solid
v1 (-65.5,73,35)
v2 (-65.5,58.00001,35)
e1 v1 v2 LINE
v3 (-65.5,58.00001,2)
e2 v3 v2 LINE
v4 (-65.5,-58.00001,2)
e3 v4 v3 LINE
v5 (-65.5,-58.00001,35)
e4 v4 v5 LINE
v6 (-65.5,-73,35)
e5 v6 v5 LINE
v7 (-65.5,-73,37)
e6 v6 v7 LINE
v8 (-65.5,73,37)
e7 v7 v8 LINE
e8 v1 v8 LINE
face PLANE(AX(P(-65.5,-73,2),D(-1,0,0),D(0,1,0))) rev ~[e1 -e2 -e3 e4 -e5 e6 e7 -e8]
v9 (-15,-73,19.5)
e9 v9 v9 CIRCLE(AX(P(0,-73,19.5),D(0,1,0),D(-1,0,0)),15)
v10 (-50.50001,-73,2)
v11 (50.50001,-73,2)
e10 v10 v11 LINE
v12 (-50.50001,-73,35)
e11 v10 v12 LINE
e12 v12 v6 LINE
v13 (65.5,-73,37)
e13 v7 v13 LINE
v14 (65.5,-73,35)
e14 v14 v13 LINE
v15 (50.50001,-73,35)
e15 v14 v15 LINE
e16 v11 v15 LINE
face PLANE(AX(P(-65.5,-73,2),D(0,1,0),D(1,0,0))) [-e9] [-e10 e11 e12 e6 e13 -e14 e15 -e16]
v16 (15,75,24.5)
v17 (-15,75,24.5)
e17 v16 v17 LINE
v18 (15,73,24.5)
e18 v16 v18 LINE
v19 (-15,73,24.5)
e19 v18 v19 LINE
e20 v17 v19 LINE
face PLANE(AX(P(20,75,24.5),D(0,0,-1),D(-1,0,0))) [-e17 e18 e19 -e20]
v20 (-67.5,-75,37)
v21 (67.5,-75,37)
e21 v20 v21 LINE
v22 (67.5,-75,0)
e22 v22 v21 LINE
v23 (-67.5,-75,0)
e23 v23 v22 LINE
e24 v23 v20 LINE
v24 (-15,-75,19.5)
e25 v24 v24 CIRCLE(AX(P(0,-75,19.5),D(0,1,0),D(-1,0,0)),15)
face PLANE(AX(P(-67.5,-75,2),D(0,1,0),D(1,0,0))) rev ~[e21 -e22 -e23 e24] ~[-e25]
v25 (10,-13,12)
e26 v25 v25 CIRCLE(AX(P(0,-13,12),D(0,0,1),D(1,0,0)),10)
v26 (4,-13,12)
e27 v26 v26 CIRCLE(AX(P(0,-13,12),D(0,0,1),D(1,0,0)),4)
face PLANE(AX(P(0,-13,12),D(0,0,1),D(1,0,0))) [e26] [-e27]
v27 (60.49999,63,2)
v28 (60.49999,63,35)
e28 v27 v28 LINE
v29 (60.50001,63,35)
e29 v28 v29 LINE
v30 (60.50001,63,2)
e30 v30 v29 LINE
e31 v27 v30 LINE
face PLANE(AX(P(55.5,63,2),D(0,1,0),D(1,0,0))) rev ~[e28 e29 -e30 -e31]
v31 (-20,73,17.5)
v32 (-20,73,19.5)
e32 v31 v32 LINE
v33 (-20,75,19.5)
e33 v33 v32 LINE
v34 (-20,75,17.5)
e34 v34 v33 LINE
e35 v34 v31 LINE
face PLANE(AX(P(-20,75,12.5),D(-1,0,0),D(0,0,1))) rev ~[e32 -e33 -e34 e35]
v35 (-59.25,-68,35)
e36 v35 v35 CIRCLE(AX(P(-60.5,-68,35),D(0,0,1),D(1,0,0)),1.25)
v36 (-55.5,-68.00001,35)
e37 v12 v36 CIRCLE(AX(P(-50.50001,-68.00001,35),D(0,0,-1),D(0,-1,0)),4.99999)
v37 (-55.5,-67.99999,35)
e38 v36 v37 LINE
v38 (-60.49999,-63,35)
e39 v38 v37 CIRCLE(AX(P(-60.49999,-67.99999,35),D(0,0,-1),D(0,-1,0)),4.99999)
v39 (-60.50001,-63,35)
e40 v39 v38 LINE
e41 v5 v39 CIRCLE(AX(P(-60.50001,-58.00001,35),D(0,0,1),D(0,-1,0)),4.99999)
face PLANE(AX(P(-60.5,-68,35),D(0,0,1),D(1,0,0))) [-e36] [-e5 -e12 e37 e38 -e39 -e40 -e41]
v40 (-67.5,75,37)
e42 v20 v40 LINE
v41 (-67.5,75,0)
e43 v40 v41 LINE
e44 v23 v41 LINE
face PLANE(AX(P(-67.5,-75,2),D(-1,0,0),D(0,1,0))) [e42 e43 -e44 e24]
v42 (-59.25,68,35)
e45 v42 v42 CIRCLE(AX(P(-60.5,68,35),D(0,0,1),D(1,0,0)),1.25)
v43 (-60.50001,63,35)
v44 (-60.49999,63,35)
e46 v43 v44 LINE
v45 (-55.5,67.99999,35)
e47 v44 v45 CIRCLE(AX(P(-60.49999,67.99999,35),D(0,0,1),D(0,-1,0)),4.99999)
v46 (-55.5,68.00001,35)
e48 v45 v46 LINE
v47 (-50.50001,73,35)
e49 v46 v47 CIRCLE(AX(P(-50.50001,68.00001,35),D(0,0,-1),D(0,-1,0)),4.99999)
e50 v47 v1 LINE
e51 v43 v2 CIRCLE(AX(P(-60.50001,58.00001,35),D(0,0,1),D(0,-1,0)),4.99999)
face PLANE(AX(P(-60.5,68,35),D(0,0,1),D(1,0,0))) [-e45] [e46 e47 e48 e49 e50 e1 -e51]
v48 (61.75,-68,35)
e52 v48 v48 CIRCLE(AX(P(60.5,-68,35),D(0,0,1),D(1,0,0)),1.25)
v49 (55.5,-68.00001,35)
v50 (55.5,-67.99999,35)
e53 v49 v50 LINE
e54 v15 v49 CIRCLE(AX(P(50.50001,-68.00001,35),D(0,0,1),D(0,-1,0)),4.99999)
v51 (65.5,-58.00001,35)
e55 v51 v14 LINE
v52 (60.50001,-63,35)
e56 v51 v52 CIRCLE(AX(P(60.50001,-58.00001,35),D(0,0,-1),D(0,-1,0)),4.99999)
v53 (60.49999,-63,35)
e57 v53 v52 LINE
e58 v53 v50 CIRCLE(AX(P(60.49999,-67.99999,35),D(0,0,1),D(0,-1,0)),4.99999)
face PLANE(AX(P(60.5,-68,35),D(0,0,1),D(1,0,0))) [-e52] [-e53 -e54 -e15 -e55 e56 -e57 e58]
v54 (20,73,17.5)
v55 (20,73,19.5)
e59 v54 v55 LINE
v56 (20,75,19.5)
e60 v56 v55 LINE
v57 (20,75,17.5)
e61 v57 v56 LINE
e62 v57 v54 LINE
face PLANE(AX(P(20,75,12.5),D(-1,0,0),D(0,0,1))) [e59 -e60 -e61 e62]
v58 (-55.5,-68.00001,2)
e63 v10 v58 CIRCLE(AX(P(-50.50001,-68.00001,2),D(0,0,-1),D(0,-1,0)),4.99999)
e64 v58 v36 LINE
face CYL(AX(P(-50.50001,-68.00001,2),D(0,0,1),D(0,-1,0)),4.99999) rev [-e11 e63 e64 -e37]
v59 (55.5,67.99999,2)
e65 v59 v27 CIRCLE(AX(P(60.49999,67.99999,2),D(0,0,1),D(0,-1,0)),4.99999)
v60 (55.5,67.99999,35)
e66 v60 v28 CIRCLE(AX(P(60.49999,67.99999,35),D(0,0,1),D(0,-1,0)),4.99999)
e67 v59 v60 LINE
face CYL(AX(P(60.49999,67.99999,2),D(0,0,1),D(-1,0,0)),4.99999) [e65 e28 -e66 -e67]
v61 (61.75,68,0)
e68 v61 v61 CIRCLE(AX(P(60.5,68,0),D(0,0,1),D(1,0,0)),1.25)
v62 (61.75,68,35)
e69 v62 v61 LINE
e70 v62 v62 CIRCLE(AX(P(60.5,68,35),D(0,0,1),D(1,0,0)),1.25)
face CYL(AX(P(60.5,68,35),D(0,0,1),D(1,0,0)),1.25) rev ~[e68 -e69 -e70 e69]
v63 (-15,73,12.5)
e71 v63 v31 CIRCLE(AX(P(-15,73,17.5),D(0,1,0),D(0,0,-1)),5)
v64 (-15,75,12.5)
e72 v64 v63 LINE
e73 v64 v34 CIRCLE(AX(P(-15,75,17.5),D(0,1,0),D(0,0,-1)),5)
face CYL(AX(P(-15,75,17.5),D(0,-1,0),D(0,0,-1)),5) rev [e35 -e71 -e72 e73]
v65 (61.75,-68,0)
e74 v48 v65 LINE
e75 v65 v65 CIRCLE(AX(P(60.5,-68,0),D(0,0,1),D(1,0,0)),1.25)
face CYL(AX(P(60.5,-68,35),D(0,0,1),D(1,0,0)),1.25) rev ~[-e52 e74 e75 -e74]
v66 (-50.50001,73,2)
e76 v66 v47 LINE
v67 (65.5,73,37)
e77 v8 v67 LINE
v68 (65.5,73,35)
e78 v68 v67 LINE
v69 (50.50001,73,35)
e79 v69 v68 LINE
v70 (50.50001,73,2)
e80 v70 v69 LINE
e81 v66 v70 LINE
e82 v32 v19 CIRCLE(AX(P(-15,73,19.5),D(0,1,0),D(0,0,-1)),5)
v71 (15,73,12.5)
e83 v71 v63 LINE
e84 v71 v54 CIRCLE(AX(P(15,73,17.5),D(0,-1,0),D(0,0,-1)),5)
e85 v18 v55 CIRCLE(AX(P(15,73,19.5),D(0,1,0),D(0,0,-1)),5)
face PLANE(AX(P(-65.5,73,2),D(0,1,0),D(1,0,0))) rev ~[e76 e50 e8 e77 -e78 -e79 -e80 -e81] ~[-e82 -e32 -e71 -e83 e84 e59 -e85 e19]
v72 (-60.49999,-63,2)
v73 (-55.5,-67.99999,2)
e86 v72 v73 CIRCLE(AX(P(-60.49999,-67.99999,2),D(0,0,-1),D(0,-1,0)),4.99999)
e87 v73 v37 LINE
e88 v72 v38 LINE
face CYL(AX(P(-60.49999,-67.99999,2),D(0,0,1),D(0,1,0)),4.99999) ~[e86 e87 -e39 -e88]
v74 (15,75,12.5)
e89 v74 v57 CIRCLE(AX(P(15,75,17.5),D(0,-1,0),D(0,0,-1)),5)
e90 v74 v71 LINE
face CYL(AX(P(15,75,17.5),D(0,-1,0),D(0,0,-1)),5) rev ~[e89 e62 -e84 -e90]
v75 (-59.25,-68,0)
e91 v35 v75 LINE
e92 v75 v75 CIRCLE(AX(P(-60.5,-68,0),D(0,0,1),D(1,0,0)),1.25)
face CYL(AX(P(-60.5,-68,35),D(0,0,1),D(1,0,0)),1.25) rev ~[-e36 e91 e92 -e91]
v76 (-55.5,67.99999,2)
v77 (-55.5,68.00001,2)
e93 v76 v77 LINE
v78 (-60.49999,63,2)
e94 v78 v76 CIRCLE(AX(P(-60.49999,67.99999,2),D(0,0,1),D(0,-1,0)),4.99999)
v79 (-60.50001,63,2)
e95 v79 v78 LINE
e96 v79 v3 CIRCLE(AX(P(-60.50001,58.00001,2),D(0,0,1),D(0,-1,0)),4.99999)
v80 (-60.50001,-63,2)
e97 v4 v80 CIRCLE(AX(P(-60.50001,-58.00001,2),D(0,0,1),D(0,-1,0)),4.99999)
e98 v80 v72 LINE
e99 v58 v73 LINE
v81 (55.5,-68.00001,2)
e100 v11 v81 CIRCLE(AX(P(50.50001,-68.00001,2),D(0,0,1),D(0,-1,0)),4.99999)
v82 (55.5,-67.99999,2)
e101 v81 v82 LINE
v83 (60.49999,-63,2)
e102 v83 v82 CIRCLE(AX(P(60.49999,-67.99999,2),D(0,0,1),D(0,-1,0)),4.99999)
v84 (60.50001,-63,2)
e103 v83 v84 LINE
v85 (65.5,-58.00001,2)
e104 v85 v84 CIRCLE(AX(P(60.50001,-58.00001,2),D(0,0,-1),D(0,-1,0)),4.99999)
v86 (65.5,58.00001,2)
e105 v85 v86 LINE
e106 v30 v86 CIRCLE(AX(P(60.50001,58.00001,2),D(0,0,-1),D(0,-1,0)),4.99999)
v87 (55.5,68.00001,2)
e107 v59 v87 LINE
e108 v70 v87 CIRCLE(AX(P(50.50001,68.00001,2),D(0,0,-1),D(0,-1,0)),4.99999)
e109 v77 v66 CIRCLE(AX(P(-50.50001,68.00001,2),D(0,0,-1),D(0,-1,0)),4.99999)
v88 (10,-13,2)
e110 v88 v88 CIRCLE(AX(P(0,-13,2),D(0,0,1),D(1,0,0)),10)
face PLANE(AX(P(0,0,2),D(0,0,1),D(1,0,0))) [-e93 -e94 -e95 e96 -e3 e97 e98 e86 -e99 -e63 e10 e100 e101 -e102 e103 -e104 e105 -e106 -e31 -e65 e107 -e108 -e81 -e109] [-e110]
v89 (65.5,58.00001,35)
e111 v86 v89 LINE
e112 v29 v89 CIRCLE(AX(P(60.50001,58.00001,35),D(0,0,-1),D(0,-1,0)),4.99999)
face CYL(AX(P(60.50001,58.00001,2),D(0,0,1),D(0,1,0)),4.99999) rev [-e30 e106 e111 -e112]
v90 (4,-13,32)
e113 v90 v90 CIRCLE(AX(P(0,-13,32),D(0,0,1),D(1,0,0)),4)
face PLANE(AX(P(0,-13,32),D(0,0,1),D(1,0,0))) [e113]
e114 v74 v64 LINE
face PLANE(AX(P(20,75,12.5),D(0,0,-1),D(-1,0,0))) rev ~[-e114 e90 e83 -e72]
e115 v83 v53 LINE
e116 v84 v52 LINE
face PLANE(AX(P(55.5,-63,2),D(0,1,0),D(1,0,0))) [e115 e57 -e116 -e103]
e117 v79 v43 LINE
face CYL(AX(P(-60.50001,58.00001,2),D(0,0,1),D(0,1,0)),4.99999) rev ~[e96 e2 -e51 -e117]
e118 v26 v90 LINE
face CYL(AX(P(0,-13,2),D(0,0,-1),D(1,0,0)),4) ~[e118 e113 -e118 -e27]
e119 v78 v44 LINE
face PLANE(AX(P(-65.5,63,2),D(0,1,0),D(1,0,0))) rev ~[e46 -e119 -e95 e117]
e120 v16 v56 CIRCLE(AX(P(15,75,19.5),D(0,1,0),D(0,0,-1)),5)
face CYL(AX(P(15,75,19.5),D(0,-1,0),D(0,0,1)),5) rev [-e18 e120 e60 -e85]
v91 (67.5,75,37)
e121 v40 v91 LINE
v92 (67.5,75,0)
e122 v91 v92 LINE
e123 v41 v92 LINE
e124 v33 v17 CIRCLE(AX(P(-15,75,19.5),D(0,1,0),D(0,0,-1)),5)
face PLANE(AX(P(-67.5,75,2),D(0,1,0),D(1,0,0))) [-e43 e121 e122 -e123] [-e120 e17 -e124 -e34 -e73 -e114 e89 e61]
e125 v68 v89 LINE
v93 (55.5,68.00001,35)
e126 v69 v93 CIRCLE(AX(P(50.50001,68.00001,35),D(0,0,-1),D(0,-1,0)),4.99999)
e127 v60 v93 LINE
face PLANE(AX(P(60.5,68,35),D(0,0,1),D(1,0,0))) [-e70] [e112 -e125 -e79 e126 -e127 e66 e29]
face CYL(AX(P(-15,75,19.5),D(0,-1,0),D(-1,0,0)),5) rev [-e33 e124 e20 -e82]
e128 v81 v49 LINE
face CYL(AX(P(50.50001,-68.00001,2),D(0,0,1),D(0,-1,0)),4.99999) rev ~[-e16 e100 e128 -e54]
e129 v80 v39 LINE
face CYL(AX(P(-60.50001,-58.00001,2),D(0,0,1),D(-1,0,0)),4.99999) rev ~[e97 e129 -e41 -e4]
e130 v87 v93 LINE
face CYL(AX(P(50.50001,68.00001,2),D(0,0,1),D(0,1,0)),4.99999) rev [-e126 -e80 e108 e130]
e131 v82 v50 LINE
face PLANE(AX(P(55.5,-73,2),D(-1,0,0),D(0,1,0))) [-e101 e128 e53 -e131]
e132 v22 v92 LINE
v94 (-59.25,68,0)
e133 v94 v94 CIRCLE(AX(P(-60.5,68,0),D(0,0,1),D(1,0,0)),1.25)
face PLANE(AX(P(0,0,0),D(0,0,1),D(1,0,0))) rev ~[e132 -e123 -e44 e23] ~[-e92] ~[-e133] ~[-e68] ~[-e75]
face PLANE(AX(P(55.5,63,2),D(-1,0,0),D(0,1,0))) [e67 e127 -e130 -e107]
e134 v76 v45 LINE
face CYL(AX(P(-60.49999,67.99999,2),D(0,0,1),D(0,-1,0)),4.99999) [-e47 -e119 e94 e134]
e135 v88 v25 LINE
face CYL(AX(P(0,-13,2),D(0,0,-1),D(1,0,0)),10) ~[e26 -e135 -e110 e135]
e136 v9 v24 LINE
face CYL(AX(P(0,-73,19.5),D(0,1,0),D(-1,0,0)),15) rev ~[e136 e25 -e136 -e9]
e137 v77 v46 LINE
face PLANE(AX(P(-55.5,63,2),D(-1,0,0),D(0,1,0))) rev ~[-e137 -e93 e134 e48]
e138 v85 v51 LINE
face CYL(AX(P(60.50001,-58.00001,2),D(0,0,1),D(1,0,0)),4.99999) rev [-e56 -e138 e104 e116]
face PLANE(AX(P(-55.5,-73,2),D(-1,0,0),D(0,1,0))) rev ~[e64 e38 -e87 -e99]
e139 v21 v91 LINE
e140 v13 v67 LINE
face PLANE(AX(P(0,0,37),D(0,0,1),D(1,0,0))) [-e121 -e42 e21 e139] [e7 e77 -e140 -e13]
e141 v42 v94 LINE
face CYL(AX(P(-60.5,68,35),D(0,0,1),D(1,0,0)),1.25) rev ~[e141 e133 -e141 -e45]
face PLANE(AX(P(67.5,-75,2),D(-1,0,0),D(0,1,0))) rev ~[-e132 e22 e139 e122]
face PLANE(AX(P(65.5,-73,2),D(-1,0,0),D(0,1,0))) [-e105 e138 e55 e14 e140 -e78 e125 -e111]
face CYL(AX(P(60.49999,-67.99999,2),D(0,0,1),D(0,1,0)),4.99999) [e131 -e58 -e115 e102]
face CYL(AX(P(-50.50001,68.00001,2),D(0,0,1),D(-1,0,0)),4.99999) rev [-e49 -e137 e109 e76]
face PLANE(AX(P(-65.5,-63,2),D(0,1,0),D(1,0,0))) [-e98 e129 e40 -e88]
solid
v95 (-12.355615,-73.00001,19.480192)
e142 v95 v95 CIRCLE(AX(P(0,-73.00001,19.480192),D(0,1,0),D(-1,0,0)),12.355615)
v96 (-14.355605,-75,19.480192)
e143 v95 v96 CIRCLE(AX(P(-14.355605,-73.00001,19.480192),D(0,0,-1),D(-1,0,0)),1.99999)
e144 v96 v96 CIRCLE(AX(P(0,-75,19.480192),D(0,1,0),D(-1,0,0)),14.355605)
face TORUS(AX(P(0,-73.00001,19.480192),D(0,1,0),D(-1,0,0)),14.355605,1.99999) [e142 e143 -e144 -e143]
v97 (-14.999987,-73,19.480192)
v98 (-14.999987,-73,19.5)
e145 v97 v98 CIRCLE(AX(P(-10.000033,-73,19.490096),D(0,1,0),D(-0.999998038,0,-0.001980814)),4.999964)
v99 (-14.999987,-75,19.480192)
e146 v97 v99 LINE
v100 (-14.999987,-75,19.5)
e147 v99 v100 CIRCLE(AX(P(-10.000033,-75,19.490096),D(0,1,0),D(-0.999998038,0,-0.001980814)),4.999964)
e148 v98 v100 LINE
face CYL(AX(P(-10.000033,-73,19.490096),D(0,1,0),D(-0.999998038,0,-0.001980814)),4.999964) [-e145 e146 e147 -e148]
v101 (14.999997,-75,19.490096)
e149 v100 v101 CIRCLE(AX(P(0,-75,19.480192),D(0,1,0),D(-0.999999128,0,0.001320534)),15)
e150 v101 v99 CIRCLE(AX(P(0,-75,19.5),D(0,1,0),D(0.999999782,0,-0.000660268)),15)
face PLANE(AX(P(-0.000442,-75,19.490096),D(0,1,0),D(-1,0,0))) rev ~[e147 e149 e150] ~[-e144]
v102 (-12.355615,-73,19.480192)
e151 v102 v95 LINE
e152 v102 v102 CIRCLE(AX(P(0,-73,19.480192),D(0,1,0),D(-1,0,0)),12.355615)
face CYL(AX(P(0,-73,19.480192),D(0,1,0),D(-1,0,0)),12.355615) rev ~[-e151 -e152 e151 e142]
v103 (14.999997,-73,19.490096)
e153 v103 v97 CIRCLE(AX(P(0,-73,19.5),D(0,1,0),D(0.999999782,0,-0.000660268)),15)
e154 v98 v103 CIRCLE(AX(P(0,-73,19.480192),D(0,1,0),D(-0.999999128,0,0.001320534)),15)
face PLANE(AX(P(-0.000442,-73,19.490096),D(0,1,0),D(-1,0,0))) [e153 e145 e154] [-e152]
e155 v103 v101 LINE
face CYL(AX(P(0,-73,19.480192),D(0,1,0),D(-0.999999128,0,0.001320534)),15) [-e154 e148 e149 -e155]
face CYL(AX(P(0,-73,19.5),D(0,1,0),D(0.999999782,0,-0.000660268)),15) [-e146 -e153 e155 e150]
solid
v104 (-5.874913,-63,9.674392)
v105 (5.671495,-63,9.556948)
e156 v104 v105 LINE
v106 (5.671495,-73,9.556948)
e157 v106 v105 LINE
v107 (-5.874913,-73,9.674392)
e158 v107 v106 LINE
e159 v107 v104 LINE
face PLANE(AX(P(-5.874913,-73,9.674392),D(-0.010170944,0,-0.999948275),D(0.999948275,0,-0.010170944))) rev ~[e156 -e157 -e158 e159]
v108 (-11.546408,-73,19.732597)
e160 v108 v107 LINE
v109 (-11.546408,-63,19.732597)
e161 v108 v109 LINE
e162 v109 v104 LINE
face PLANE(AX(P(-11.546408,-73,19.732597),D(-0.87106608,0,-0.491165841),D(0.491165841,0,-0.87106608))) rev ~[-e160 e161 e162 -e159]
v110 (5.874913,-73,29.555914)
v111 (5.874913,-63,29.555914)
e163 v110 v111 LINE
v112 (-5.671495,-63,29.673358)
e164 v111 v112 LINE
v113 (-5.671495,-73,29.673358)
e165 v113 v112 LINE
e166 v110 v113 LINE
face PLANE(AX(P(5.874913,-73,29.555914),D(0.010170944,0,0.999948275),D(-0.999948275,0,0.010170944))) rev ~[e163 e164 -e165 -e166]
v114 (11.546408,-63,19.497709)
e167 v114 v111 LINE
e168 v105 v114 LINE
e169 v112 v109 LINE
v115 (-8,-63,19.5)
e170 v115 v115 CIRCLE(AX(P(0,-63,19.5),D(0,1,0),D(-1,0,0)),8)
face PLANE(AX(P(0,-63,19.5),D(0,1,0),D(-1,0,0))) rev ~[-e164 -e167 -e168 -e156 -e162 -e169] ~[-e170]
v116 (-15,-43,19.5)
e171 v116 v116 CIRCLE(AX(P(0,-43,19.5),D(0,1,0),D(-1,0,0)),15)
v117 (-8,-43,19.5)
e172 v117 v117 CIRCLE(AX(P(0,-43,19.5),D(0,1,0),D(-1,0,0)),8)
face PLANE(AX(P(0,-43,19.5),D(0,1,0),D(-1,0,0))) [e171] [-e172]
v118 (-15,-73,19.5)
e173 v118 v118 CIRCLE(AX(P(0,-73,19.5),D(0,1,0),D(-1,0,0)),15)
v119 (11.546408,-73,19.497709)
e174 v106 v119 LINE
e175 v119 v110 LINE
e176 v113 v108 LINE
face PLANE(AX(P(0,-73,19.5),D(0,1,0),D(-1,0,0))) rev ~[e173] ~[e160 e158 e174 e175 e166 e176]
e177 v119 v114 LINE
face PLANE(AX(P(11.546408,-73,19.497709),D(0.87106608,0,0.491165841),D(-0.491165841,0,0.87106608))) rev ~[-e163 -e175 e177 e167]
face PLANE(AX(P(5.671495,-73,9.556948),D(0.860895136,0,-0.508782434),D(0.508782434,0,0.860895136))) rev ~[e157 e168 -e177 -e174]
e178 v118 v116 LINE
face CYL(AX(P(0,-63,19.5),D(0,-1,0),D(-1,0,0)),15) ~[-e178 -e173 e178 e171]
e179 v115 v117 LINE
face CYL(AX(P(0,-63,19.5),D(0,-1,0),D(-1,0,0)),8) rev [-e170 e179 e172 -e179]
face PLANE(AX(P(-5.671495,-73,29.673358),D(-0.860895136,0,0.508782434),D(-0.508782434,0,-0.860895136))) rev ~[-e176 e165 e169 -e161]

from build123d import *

# Parameters (mm, degrees)
F0_W      = 135
F0_H      = 150
F1_DEPTH  = 2
F2_W      = 135
F2_H      = 150
F2_W_2    = 131
F2_H_2    = 146
F3_DEPTH  = 35
F4_R      = 4
F5_DEPTH  = 30
F6_R      = 10
F6_R_2    = 4
F7_DEPTH  = 10
F9_R      = 15
F10_DEPTH = 10
F8_R      = 15
F12_DEPTH = 5
F13_R     = 15
F13_R_2   = 8
F14_DEPTH = 20
F15_W     = 40
F15_H     = 12
F16_DEPTH = 2
F17_R     = 5
F18_W     = 10
F18_H     = 10
F19_DEPTH = 33
F20_R     = 1.25
F21_DEPTH = 35.001
F22_R     = 4.99999
F23_R     = 12.3556147712
F24_DEPTH = 2
F25_R     = 1.99999


# Not quite as in the source:
# - a fillet or chamfer is up to 0.001 mm smaller than in the source, because OpenCascade refuses the exact size
# - ends of sketch curves that miss each other by under 0.0002 mm in the source are joined
# - a feature of the source that left no trace in its solid (it failed there, or was rolled back) is left out


with BuildPart() as f1:
    # F0 (on Top) → F1 (new body)
    with BuildSketch(Plane.XY):
        Rectangle(F0_W, F0_H)
    extrude(amount=F1_DEPTH)

    # F2 (on face) → F3 (join)
    with BuildSketch(Plane.XY.offset(2)):
        Rectangle(F2_W, F2_H)
        Rectangle(F2_W_2, F2_H_2, mode=Mode.SUBTRACT)
    extrude(amount=F3_DEPTH)

    # F4 (on face) → F5 (join)
    with BuildSketch(Plane.XY.offset(2)):
        with Locations((0, -13)):
            Circle(F4_R)
    extrude(amount=F5_DEPTH)

    # F6 (on face) → F7 (join)
    with BuildSketch(Plane.XY.offset(2)):
        with Locations((0, -13)):
            Circle(F6_R)
        with Locations((0, -13)):
            Circle(F6_R_2, mode=Mode.SUBTRACT)
    extrude(amount=F7_DEPTH)

    # F8 (on face) → F12 (cut)
    with BuildSketch(Plane(origin=(0, -73, 0), x_dir=(-1, 0, 0), z_dir=(0, 1, 0))):
        with Locations((0, 19.5)):
            Circle(F8_R)
    extrude(amount=-F12_DEPTH, mode=Mode.SUBTRACT)

    # F15 (on face) → F16 (cut)
    with BuildSketch(Plane(origin=(0, 75, 0), x_dir=(-1, 0, 0), z_dir=(0, 1, 0))):
        with Locations((0, 18.5)):
            Rectangle(F15_W, F15_H)
    extrude(amount=-F16_DEPTH, mode=Mode.SUBTRACT)

    # F17
    f17_edges = [f1.edges().sort_by_distance(p)[0] for p in [
        (-20, 74, 12.5),
        (20, 74, 12.5),
        (-20, 74, 24.5),
        (20, 74, 24.5),
    ]]
    fillet(f17_edges, radius=F17_R)

    # F18 (on face) → F19 (join)
    with BuildSketch(Plane.XY.offset(2)):
        with Locations((-60.5, 68)):
            Rectangle(F18_W, F18_H)
        with Locations((60.5, 68)):
            Rectangle(F18_W, F18_H)
        with Locations((60.5, -68)):
            Rectangle(F18_W, F18_H)
        with Locations((-60.5, -68)):
            Rectangle(F18_W, F18_H)
    extrude(amount=F19_DEPTH)

    # F20 (on face) → F21 (cut, through all)
    with BuildSketch(Plane.XY.offset(35)):
        with Locations((-60.5, 68)):
            Circle(F20_R)
        with Locations((60.5, 68)):
            Circle(F20_R)
        with Locations((60.5, -68)):
            Circle(F20_R)
        with Locations((-60.5, -68)):
            Circle(F20_R)
    extrude(amount=-F21_DEPTH, mode=Mode.SUBTRACT)

    # F22 (radius 5 in the source; OpenCascade refuses exactly that, so slightly less here)
    f22_edges = [f1.edges().sort_by_distance(p)[0] for p in [
        (-55.5, 73, 18.5),
        (-55.5, 63, 18.5),
        (-65.5, 63, 18.5),
        (55.5, 73, 18.5),
        (55.5, 63, 18.5),
        (65.5, 63, 18.5),
        (65.5, -63, 18.5),
        (55.5, -63, 18.5),
        (55.5, -73, 18.5),
        (-65.5, -63, 18.5),
        (-55.5, -63, 18.5),
        (-55.5, -73, 18.5),
    ]]
    fillet(f22_edges, radius=F22_R)


with BuildPart() as f10:
    # F9 (on face) → F10 (new body)
    with BuildSketch(Plane(origin=(0, -73, 0), x_dir=(-1, 0, 0), z_dir=(0, 1, 0))):
        with Locations((0, 19.5)):
            Circle(F9_R)
        Polygon((5.6714946114, 29.6733575716), (11.5464081104, 19.7325968002), (5.874913499, 9.6743920794), (-5.6714946114, 9.5569481299), (-11.5464081104, 19.4977089013), (-5.874913499, 29.5559136221), align=None, mode=Mode.SUBTRACT)
    extrude(amount=F10_DEPTH)

    # F13 (on face) → F14 (join)
    with BuildSketch(Plane(origin=(0, -63, 0), x_dir=(-1, 0, 0), z_dir=(0, 1, 0))):
        with Locations((0, 19.5)):
            Circle(F13_R)
        Polygon((-5.874913499, 29.5559136221), (5.6714946114, 29.6733575716), (11.5464081104, 19.7325968002), (5.874913499, 9.6743920794), (-5.6714946114, 9.5569481299), (-11.5464081104, 19.4977089013), align=None, mode=Mode.SUBTRACT)
        Polygon((11.5464081104, 19.7325968002), (5.6714946114, 29.6733575716), (-5.874913499, 29.5559136221), (-11.5464081104, 19.4977089013), (-5.6714946114, 9.5569481299), (5.874913499, 9.6743920794), align=None)
        with Locations((0, 19.5)):
            Circle(F13_R_2, mode=Mode.SUBTRACT)
    extrude(amount=F14_DEPTH)


with BuildPart() as f24:
    # F23 (on face) → F24 (new body)
    with BuildSketch(Plane(origin=(0, -73, 0), x_dir=(-1, 0, 0), z_dir=(0, 1, 0))):
        with BuildLine():
            ThreePointArc((-14.9999967303, 19.4900959839), (-0.0049520018, 4.5000008174), (14.9999869214, 19.4801919852))
            ThreePointArc((14.9999869214, 19.4801919852), (14.9999967304, 19.4900959775), (14.9999869214, 19.4999999827))
            ThreePointArc((14.9999869214, 19.4999999827), (-0.0049520018, 34.4801911505), (-14.9999967303, 19.4900959839))
        make_face()
        with Locations((0, 19.4801919679)):
            Circle(F23_R, mode=Mode.SUBTRACT)
    extrude(amount=-F24_DEPTH)

    # F25 (radius 2 in the source; OpenCascade refuses exactly that, so slightly less here)
    f25_edges = [f24.edges().sort_by_distance(p)[0] for p in [
        (12.355615, -75, 19.480192),
    ]]
    fillet(f25_edges, radius=F25_R)


solid = Compound([f1.part, f10.part, f24.part])
